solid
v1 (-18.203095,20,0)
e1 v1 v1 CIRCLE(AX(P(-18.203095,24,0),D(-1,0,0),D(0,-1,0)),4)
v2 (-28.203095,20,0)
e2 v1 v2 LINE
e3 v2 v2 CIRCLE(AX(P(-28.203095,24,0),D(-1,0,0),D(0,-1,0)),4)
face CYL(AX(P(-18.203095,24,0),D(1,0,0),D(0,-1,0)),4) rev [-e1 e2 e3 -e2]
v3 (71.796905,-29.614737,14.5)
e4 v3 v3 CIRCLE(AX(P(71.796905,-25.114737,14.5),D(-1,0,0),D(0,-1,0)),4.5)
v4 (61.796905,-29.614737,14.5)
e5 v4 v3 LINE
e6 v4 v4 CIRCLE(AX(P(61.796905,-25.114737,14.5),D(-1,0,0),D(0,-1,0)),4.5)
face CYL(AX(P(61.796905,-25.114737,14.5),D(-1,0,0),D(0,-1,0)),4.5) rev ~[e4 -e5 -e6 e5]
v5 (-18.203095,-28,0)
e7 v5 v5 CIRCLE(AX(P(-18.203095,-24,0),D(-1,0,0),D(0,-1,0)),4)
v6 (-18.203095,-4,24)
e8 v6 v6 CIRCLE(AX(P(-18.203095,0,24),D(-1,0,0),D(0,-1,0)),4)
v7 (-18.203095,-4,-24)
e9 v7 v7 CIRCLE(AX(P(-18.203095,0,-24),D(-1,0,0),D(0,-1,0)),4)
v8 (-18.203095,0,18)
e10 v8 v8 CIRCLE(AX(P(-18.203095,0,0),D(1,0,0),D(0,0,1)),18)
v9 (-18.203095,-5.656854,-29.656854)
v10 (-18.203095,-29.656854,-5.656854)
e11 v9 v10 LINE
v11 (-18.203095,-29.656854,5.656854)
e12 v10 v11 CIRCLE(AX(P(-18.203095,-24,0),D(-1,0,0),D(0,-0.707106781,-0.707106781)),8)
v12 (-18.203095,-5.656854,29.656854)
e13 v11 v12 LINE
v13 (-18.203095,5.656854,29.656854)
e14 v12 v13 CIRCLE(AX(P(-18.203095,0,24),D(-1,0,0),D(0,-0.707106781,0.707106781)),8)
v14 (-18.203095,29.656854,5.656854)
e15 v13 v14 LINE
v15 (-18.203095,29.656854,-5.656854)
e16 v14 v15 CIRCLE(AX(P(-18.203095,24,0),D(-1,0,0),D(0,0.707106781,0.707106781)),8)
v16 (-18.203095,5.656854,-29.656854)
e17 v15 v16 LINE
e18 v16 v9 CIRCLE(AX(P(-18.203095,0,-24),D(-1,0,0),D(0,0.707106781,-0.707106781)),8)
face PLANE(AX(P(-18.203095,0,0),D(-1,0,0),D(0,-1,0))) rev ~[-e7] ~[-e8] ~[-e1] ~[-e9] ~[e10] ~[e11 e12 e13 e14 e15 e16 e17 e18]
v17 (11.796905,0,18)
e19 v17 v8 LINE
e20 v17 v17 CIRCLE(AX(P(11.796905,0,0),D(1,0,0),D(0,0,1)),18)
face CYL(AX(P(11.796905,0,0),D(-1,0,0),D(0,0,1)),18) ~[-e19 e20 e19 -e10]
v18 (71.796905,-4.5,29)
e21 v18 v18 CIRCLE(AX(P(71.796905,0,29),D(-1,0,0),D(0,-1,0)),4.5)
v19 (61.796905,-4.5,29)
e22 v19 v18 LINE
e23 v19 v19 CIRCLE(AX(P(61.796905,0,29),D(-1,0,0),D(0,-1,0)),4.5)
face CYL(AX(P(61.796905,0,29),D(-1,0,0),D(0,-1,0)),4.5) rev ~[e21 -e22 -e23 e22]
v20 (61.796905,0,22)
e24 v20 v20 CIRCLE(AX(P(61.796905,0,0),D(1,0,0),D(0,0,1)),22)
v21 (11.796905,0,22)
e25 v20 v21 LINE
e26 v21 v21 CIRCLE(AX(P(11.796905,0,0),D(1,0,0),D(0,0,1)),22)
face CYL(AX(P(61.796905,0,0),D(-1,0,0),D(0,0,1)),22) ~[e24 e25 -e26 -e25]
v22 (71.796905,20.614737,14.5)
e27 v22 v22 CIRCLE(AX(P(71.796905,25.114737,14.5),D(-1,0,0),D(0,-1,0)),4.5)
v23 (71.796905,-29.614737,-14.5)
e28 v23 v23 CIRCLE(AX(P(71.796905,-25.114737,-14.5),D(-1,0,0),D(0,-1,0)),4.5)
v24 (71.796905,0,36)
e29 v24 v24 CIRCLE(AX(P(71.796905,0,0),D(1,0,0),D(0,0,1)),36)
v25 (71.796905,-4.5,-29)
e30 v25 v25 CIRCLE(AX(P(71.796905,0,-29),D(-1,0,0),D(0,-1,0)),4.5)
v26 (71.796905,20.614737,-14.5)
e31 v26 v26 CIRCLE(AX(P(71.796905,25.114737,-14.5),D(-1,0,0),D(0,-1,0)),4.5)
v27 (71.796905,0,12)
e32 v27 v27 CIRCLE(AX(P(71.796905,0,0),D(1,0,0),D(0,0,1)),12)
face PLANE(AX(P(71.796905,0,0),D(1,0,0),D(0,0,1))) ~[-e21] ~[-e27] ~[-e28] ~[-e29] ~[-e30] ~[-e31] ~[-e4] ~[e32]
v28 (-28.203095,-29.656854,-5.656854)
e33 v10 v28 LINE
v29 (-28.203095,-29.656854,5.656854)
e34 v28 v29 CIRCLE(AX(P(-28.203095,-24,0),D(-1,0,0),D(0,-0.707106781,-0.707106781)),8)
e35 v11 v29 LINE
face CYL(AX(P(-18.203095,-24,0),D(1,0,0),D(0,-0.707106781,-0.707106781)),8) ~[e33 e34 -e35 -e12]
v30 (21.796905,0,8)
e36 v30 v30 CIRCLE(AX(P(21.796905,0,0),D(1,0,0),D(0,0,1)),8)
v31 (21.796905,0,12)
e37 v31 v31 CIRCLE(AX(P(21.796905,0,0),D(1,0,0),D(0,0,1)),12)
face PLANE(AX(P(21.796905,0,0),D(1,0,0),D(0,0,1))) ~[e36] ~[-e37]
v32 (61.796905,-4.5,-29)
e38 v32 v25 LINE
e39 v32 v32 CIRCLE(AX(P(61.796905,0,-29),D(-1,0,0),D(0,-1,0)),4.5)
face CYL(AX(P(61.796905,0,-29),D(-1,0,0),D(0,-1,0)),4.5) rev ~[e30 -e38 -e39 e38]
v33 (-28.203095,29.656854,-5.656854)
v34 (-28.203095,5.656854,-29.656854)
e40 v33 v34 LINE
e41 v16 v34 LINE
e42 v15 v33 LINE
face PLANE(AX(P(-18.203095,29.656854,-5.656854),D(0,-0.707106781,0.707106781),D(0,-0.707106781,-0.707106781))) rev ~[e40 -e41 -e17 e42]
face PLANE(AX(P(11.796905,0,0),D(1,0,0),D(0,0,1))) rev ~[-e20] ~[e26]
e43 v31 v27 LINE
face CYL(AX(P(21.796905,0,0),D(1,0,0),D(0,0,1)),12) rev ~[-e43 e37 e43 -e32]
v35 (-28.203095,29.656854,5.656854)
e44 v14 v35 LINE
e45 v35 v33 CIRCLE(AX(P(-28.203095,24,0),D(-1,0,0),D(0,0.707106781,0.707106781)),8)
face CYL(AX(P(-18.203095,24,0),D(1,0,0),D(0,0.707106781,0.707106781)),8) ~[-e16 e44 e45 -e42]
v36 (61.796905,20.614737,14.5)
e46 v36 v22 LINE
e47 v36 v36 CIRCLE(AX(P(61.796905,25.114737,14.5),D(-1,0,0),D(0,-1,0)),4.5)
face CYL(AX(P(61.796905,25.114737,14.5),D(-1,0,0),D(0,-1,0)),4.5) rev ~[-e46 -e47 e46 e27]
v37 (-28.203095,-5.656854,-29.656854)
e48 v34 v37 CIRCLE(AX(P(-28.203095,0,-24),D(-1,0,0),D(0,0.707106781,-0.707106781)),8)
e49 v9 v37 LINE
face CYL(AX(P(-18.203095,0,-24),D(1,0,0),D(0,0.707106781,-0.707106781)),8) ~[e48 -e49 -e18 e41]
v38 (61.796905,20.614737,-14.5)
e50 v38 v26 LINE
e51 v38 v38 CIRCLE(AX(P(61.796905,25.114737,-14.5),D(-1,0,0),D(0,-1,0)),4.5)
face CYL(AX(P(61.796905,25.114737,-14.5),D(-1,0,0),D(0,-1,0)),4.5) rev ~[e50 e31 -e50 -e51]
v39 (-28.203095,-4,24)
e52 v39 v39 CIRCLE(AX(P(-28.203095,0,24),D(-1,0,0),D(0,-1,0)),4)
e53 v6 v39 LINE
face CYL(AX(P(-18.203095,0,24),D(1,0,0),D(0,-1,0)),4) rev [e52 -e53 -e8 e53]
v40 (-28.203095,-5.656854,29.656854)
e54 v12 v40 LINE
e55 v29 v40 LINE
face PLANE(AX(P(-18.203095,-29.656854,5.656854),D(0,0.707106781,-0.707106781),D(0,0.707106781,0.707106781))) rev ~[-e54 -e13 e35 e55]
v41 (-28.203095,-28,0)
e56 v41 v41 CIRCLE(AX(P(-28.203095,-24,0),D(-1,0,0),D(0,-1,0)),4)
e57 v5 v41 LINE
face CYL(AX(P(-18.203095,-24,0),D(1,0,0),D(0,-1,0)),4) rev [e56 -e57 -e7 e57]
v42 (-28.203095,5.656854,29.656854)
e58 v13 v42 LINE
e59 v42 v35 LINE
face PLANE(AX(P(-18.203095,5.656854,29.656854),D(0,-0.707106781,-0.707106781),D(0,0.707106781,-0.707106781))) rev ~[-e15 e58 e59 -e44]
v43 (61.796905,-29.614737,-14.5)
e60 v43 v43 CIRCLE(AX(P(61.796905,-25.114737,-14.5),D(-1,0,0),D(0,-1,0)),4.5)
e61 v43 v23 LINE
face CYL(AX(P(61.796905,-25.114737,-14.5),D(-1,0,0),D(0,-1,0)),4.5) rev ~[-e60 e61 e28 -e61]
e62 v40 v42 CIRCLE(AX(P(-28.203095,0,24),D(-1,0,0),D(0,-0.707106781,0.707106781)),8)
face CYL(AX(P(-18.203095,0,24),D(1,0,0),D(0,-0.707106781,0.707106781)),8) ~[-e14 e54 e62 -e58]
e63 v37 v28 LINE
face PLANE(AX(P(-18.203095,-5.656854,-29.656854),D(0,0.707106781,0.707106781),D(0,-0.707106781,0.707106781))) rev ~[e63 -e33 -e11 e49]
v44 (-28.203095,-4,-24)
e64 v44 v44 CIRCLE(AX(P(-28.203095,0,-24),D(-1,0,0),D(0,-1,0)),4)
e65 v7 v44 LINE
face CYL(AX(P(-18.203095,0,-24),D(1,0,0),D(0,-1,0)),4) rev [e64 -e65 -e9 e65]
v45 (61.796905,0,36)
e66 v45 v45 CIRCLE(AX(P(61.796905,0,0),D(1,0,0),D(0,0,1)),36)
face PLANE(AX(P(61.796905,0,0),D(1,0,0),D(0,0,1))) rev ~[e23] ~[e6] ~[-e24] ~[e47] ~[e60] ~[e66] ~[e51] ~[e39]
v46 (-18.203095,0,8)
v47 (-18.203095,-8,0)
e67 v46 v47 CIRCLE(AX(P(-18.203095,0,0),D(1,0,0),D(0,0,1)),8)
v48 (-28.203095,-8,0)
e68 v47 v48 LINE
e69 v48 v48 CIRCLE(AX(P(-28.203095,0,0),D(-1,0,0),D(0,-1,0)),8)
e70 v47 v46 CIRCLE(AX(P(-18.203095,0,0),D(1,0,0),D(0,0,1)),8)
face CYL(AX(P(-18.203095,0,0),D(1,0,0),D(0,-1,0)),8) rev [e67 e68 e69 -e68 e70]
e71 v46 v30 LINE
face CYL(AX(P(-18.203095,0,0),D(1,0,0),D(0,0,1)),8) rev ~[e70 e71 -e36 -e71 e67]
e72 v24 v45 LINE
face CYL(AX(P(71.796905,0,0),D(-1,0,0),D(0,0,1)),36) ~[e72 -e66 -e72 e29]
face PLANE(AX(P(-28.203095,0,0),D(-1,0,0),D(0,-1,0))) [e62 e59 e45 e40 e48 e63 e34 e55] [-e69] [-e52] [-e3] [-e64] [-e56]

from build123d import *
from build123d import SkipClean  # not in build123d's __all__

# Parameters (mm, degrees)
F2_R     = 4.5
F3_DEPTH = 10.001
F4_R     = 4
F4_R_2   = 18
F4_R_3   = 8
F5_DEPTH = 10


with BuildPart() as f1:
    # F0 (on Front) → F1 (revolve)
    with BuildSketch(Plane.XZ):
        Polygon((-18.203094868, 18), (-18.203094868, 8), (21.796905132, 8), (21.796905132, 12), (71.796905132, 12), (71.796905132, 36), (61.796905132, 36), (61.796905132, 22), (11.796905132, 22), (11.796905132, 18), align=None)
    revolve(axis=Axis((24.6733184904, 0, 0), (1, 0, 0)))

    # F2 (on face) → F3 (cut, through all)
    with BuildSketch(Plane(origin=(61.796905132, 0, 0), x_dir=(0, -1, 0), z_dir=(-1, 0, 0))):
        with Locations((0, 29)):
            Circle(F2_R)
        with Locations((-25.1147367097, 14.5)):
            Circle(F2_R)
        with Locations((-25.1147367097, -14.5)):
            Circle(F2_R)
        with Locations((0, -29)):
            Circle(F2_R)
        with Locations((25.1147367097, -14.5)):
            Circle(F2_R)
        with Locations((25.1147367097, 14.5)):
            Circle(F2_R)
    extrude(amount=-F3_DEPTH, mode=Mode.SUBTRACT)

    # F4 (on face) → F5 (join)
    with BuildSketch(Plane(origin=(-18.203094868, 0, 0), x_dir=(0, -1, 0), z_dir=(-1, 0, 0))):
        with BuildLine():
            ThreePointArc((5.6568542495, 29.6568542495), (0, 32), (-5.6568542495, 29.6568542495))
            Line((-5.6568542495, 29.6568542495), (-29.6568542495, 5.6568542495))
            ThreePointArc((-29.6568542495, 5.6568542495), (-32, 0), (-29.6568542495, -5.6568542495))
            Line((-29.6568542495, -5.6568542495), (-5.6568542495, -29.6568542495))
            ThreePointArc((-5.6568542495, -29.6568542495), (0, -32), (5.6568542495, -29.6568542495))
            Line((5.6568542495, -29.6568542495), (29.6568542495, -5.6568542495))
            ThreePointArc((29.6568542495, -5.6568542495), (32, 0), (29.6568542495, 5.6568542495))
            Line((29.6568542495, 5.6568542495), (5.6568542495, 29.6568542495))
        make_face()
        with Locations((0, -24)):
            Circle(F4_R, mode=Mode.SUBTRACT)
        with Locations((-24, 0)):
            Circle(F4_R, mode=Mode.SUBTRACT)
        Circle(F4_R_2, mode=Mode.SUBTRACT)
        with Locations((24, 0)):
            Circle(F4_R, mode=Mode.SUBTRACT)
        with Locations((0, 24)):
            Circle(F4_R, mode=Mode.SUBTRACT)
        Circle(F4_R_2)
        Circle(F4_R_3, mode=Mode.SUBTRACT)
    with SkipClean():  # cleaning this boolean's faces spoils the solid; the shape is the same uncleaned
        extrude(amount=F5_DEPTH)


solid = f1.part
